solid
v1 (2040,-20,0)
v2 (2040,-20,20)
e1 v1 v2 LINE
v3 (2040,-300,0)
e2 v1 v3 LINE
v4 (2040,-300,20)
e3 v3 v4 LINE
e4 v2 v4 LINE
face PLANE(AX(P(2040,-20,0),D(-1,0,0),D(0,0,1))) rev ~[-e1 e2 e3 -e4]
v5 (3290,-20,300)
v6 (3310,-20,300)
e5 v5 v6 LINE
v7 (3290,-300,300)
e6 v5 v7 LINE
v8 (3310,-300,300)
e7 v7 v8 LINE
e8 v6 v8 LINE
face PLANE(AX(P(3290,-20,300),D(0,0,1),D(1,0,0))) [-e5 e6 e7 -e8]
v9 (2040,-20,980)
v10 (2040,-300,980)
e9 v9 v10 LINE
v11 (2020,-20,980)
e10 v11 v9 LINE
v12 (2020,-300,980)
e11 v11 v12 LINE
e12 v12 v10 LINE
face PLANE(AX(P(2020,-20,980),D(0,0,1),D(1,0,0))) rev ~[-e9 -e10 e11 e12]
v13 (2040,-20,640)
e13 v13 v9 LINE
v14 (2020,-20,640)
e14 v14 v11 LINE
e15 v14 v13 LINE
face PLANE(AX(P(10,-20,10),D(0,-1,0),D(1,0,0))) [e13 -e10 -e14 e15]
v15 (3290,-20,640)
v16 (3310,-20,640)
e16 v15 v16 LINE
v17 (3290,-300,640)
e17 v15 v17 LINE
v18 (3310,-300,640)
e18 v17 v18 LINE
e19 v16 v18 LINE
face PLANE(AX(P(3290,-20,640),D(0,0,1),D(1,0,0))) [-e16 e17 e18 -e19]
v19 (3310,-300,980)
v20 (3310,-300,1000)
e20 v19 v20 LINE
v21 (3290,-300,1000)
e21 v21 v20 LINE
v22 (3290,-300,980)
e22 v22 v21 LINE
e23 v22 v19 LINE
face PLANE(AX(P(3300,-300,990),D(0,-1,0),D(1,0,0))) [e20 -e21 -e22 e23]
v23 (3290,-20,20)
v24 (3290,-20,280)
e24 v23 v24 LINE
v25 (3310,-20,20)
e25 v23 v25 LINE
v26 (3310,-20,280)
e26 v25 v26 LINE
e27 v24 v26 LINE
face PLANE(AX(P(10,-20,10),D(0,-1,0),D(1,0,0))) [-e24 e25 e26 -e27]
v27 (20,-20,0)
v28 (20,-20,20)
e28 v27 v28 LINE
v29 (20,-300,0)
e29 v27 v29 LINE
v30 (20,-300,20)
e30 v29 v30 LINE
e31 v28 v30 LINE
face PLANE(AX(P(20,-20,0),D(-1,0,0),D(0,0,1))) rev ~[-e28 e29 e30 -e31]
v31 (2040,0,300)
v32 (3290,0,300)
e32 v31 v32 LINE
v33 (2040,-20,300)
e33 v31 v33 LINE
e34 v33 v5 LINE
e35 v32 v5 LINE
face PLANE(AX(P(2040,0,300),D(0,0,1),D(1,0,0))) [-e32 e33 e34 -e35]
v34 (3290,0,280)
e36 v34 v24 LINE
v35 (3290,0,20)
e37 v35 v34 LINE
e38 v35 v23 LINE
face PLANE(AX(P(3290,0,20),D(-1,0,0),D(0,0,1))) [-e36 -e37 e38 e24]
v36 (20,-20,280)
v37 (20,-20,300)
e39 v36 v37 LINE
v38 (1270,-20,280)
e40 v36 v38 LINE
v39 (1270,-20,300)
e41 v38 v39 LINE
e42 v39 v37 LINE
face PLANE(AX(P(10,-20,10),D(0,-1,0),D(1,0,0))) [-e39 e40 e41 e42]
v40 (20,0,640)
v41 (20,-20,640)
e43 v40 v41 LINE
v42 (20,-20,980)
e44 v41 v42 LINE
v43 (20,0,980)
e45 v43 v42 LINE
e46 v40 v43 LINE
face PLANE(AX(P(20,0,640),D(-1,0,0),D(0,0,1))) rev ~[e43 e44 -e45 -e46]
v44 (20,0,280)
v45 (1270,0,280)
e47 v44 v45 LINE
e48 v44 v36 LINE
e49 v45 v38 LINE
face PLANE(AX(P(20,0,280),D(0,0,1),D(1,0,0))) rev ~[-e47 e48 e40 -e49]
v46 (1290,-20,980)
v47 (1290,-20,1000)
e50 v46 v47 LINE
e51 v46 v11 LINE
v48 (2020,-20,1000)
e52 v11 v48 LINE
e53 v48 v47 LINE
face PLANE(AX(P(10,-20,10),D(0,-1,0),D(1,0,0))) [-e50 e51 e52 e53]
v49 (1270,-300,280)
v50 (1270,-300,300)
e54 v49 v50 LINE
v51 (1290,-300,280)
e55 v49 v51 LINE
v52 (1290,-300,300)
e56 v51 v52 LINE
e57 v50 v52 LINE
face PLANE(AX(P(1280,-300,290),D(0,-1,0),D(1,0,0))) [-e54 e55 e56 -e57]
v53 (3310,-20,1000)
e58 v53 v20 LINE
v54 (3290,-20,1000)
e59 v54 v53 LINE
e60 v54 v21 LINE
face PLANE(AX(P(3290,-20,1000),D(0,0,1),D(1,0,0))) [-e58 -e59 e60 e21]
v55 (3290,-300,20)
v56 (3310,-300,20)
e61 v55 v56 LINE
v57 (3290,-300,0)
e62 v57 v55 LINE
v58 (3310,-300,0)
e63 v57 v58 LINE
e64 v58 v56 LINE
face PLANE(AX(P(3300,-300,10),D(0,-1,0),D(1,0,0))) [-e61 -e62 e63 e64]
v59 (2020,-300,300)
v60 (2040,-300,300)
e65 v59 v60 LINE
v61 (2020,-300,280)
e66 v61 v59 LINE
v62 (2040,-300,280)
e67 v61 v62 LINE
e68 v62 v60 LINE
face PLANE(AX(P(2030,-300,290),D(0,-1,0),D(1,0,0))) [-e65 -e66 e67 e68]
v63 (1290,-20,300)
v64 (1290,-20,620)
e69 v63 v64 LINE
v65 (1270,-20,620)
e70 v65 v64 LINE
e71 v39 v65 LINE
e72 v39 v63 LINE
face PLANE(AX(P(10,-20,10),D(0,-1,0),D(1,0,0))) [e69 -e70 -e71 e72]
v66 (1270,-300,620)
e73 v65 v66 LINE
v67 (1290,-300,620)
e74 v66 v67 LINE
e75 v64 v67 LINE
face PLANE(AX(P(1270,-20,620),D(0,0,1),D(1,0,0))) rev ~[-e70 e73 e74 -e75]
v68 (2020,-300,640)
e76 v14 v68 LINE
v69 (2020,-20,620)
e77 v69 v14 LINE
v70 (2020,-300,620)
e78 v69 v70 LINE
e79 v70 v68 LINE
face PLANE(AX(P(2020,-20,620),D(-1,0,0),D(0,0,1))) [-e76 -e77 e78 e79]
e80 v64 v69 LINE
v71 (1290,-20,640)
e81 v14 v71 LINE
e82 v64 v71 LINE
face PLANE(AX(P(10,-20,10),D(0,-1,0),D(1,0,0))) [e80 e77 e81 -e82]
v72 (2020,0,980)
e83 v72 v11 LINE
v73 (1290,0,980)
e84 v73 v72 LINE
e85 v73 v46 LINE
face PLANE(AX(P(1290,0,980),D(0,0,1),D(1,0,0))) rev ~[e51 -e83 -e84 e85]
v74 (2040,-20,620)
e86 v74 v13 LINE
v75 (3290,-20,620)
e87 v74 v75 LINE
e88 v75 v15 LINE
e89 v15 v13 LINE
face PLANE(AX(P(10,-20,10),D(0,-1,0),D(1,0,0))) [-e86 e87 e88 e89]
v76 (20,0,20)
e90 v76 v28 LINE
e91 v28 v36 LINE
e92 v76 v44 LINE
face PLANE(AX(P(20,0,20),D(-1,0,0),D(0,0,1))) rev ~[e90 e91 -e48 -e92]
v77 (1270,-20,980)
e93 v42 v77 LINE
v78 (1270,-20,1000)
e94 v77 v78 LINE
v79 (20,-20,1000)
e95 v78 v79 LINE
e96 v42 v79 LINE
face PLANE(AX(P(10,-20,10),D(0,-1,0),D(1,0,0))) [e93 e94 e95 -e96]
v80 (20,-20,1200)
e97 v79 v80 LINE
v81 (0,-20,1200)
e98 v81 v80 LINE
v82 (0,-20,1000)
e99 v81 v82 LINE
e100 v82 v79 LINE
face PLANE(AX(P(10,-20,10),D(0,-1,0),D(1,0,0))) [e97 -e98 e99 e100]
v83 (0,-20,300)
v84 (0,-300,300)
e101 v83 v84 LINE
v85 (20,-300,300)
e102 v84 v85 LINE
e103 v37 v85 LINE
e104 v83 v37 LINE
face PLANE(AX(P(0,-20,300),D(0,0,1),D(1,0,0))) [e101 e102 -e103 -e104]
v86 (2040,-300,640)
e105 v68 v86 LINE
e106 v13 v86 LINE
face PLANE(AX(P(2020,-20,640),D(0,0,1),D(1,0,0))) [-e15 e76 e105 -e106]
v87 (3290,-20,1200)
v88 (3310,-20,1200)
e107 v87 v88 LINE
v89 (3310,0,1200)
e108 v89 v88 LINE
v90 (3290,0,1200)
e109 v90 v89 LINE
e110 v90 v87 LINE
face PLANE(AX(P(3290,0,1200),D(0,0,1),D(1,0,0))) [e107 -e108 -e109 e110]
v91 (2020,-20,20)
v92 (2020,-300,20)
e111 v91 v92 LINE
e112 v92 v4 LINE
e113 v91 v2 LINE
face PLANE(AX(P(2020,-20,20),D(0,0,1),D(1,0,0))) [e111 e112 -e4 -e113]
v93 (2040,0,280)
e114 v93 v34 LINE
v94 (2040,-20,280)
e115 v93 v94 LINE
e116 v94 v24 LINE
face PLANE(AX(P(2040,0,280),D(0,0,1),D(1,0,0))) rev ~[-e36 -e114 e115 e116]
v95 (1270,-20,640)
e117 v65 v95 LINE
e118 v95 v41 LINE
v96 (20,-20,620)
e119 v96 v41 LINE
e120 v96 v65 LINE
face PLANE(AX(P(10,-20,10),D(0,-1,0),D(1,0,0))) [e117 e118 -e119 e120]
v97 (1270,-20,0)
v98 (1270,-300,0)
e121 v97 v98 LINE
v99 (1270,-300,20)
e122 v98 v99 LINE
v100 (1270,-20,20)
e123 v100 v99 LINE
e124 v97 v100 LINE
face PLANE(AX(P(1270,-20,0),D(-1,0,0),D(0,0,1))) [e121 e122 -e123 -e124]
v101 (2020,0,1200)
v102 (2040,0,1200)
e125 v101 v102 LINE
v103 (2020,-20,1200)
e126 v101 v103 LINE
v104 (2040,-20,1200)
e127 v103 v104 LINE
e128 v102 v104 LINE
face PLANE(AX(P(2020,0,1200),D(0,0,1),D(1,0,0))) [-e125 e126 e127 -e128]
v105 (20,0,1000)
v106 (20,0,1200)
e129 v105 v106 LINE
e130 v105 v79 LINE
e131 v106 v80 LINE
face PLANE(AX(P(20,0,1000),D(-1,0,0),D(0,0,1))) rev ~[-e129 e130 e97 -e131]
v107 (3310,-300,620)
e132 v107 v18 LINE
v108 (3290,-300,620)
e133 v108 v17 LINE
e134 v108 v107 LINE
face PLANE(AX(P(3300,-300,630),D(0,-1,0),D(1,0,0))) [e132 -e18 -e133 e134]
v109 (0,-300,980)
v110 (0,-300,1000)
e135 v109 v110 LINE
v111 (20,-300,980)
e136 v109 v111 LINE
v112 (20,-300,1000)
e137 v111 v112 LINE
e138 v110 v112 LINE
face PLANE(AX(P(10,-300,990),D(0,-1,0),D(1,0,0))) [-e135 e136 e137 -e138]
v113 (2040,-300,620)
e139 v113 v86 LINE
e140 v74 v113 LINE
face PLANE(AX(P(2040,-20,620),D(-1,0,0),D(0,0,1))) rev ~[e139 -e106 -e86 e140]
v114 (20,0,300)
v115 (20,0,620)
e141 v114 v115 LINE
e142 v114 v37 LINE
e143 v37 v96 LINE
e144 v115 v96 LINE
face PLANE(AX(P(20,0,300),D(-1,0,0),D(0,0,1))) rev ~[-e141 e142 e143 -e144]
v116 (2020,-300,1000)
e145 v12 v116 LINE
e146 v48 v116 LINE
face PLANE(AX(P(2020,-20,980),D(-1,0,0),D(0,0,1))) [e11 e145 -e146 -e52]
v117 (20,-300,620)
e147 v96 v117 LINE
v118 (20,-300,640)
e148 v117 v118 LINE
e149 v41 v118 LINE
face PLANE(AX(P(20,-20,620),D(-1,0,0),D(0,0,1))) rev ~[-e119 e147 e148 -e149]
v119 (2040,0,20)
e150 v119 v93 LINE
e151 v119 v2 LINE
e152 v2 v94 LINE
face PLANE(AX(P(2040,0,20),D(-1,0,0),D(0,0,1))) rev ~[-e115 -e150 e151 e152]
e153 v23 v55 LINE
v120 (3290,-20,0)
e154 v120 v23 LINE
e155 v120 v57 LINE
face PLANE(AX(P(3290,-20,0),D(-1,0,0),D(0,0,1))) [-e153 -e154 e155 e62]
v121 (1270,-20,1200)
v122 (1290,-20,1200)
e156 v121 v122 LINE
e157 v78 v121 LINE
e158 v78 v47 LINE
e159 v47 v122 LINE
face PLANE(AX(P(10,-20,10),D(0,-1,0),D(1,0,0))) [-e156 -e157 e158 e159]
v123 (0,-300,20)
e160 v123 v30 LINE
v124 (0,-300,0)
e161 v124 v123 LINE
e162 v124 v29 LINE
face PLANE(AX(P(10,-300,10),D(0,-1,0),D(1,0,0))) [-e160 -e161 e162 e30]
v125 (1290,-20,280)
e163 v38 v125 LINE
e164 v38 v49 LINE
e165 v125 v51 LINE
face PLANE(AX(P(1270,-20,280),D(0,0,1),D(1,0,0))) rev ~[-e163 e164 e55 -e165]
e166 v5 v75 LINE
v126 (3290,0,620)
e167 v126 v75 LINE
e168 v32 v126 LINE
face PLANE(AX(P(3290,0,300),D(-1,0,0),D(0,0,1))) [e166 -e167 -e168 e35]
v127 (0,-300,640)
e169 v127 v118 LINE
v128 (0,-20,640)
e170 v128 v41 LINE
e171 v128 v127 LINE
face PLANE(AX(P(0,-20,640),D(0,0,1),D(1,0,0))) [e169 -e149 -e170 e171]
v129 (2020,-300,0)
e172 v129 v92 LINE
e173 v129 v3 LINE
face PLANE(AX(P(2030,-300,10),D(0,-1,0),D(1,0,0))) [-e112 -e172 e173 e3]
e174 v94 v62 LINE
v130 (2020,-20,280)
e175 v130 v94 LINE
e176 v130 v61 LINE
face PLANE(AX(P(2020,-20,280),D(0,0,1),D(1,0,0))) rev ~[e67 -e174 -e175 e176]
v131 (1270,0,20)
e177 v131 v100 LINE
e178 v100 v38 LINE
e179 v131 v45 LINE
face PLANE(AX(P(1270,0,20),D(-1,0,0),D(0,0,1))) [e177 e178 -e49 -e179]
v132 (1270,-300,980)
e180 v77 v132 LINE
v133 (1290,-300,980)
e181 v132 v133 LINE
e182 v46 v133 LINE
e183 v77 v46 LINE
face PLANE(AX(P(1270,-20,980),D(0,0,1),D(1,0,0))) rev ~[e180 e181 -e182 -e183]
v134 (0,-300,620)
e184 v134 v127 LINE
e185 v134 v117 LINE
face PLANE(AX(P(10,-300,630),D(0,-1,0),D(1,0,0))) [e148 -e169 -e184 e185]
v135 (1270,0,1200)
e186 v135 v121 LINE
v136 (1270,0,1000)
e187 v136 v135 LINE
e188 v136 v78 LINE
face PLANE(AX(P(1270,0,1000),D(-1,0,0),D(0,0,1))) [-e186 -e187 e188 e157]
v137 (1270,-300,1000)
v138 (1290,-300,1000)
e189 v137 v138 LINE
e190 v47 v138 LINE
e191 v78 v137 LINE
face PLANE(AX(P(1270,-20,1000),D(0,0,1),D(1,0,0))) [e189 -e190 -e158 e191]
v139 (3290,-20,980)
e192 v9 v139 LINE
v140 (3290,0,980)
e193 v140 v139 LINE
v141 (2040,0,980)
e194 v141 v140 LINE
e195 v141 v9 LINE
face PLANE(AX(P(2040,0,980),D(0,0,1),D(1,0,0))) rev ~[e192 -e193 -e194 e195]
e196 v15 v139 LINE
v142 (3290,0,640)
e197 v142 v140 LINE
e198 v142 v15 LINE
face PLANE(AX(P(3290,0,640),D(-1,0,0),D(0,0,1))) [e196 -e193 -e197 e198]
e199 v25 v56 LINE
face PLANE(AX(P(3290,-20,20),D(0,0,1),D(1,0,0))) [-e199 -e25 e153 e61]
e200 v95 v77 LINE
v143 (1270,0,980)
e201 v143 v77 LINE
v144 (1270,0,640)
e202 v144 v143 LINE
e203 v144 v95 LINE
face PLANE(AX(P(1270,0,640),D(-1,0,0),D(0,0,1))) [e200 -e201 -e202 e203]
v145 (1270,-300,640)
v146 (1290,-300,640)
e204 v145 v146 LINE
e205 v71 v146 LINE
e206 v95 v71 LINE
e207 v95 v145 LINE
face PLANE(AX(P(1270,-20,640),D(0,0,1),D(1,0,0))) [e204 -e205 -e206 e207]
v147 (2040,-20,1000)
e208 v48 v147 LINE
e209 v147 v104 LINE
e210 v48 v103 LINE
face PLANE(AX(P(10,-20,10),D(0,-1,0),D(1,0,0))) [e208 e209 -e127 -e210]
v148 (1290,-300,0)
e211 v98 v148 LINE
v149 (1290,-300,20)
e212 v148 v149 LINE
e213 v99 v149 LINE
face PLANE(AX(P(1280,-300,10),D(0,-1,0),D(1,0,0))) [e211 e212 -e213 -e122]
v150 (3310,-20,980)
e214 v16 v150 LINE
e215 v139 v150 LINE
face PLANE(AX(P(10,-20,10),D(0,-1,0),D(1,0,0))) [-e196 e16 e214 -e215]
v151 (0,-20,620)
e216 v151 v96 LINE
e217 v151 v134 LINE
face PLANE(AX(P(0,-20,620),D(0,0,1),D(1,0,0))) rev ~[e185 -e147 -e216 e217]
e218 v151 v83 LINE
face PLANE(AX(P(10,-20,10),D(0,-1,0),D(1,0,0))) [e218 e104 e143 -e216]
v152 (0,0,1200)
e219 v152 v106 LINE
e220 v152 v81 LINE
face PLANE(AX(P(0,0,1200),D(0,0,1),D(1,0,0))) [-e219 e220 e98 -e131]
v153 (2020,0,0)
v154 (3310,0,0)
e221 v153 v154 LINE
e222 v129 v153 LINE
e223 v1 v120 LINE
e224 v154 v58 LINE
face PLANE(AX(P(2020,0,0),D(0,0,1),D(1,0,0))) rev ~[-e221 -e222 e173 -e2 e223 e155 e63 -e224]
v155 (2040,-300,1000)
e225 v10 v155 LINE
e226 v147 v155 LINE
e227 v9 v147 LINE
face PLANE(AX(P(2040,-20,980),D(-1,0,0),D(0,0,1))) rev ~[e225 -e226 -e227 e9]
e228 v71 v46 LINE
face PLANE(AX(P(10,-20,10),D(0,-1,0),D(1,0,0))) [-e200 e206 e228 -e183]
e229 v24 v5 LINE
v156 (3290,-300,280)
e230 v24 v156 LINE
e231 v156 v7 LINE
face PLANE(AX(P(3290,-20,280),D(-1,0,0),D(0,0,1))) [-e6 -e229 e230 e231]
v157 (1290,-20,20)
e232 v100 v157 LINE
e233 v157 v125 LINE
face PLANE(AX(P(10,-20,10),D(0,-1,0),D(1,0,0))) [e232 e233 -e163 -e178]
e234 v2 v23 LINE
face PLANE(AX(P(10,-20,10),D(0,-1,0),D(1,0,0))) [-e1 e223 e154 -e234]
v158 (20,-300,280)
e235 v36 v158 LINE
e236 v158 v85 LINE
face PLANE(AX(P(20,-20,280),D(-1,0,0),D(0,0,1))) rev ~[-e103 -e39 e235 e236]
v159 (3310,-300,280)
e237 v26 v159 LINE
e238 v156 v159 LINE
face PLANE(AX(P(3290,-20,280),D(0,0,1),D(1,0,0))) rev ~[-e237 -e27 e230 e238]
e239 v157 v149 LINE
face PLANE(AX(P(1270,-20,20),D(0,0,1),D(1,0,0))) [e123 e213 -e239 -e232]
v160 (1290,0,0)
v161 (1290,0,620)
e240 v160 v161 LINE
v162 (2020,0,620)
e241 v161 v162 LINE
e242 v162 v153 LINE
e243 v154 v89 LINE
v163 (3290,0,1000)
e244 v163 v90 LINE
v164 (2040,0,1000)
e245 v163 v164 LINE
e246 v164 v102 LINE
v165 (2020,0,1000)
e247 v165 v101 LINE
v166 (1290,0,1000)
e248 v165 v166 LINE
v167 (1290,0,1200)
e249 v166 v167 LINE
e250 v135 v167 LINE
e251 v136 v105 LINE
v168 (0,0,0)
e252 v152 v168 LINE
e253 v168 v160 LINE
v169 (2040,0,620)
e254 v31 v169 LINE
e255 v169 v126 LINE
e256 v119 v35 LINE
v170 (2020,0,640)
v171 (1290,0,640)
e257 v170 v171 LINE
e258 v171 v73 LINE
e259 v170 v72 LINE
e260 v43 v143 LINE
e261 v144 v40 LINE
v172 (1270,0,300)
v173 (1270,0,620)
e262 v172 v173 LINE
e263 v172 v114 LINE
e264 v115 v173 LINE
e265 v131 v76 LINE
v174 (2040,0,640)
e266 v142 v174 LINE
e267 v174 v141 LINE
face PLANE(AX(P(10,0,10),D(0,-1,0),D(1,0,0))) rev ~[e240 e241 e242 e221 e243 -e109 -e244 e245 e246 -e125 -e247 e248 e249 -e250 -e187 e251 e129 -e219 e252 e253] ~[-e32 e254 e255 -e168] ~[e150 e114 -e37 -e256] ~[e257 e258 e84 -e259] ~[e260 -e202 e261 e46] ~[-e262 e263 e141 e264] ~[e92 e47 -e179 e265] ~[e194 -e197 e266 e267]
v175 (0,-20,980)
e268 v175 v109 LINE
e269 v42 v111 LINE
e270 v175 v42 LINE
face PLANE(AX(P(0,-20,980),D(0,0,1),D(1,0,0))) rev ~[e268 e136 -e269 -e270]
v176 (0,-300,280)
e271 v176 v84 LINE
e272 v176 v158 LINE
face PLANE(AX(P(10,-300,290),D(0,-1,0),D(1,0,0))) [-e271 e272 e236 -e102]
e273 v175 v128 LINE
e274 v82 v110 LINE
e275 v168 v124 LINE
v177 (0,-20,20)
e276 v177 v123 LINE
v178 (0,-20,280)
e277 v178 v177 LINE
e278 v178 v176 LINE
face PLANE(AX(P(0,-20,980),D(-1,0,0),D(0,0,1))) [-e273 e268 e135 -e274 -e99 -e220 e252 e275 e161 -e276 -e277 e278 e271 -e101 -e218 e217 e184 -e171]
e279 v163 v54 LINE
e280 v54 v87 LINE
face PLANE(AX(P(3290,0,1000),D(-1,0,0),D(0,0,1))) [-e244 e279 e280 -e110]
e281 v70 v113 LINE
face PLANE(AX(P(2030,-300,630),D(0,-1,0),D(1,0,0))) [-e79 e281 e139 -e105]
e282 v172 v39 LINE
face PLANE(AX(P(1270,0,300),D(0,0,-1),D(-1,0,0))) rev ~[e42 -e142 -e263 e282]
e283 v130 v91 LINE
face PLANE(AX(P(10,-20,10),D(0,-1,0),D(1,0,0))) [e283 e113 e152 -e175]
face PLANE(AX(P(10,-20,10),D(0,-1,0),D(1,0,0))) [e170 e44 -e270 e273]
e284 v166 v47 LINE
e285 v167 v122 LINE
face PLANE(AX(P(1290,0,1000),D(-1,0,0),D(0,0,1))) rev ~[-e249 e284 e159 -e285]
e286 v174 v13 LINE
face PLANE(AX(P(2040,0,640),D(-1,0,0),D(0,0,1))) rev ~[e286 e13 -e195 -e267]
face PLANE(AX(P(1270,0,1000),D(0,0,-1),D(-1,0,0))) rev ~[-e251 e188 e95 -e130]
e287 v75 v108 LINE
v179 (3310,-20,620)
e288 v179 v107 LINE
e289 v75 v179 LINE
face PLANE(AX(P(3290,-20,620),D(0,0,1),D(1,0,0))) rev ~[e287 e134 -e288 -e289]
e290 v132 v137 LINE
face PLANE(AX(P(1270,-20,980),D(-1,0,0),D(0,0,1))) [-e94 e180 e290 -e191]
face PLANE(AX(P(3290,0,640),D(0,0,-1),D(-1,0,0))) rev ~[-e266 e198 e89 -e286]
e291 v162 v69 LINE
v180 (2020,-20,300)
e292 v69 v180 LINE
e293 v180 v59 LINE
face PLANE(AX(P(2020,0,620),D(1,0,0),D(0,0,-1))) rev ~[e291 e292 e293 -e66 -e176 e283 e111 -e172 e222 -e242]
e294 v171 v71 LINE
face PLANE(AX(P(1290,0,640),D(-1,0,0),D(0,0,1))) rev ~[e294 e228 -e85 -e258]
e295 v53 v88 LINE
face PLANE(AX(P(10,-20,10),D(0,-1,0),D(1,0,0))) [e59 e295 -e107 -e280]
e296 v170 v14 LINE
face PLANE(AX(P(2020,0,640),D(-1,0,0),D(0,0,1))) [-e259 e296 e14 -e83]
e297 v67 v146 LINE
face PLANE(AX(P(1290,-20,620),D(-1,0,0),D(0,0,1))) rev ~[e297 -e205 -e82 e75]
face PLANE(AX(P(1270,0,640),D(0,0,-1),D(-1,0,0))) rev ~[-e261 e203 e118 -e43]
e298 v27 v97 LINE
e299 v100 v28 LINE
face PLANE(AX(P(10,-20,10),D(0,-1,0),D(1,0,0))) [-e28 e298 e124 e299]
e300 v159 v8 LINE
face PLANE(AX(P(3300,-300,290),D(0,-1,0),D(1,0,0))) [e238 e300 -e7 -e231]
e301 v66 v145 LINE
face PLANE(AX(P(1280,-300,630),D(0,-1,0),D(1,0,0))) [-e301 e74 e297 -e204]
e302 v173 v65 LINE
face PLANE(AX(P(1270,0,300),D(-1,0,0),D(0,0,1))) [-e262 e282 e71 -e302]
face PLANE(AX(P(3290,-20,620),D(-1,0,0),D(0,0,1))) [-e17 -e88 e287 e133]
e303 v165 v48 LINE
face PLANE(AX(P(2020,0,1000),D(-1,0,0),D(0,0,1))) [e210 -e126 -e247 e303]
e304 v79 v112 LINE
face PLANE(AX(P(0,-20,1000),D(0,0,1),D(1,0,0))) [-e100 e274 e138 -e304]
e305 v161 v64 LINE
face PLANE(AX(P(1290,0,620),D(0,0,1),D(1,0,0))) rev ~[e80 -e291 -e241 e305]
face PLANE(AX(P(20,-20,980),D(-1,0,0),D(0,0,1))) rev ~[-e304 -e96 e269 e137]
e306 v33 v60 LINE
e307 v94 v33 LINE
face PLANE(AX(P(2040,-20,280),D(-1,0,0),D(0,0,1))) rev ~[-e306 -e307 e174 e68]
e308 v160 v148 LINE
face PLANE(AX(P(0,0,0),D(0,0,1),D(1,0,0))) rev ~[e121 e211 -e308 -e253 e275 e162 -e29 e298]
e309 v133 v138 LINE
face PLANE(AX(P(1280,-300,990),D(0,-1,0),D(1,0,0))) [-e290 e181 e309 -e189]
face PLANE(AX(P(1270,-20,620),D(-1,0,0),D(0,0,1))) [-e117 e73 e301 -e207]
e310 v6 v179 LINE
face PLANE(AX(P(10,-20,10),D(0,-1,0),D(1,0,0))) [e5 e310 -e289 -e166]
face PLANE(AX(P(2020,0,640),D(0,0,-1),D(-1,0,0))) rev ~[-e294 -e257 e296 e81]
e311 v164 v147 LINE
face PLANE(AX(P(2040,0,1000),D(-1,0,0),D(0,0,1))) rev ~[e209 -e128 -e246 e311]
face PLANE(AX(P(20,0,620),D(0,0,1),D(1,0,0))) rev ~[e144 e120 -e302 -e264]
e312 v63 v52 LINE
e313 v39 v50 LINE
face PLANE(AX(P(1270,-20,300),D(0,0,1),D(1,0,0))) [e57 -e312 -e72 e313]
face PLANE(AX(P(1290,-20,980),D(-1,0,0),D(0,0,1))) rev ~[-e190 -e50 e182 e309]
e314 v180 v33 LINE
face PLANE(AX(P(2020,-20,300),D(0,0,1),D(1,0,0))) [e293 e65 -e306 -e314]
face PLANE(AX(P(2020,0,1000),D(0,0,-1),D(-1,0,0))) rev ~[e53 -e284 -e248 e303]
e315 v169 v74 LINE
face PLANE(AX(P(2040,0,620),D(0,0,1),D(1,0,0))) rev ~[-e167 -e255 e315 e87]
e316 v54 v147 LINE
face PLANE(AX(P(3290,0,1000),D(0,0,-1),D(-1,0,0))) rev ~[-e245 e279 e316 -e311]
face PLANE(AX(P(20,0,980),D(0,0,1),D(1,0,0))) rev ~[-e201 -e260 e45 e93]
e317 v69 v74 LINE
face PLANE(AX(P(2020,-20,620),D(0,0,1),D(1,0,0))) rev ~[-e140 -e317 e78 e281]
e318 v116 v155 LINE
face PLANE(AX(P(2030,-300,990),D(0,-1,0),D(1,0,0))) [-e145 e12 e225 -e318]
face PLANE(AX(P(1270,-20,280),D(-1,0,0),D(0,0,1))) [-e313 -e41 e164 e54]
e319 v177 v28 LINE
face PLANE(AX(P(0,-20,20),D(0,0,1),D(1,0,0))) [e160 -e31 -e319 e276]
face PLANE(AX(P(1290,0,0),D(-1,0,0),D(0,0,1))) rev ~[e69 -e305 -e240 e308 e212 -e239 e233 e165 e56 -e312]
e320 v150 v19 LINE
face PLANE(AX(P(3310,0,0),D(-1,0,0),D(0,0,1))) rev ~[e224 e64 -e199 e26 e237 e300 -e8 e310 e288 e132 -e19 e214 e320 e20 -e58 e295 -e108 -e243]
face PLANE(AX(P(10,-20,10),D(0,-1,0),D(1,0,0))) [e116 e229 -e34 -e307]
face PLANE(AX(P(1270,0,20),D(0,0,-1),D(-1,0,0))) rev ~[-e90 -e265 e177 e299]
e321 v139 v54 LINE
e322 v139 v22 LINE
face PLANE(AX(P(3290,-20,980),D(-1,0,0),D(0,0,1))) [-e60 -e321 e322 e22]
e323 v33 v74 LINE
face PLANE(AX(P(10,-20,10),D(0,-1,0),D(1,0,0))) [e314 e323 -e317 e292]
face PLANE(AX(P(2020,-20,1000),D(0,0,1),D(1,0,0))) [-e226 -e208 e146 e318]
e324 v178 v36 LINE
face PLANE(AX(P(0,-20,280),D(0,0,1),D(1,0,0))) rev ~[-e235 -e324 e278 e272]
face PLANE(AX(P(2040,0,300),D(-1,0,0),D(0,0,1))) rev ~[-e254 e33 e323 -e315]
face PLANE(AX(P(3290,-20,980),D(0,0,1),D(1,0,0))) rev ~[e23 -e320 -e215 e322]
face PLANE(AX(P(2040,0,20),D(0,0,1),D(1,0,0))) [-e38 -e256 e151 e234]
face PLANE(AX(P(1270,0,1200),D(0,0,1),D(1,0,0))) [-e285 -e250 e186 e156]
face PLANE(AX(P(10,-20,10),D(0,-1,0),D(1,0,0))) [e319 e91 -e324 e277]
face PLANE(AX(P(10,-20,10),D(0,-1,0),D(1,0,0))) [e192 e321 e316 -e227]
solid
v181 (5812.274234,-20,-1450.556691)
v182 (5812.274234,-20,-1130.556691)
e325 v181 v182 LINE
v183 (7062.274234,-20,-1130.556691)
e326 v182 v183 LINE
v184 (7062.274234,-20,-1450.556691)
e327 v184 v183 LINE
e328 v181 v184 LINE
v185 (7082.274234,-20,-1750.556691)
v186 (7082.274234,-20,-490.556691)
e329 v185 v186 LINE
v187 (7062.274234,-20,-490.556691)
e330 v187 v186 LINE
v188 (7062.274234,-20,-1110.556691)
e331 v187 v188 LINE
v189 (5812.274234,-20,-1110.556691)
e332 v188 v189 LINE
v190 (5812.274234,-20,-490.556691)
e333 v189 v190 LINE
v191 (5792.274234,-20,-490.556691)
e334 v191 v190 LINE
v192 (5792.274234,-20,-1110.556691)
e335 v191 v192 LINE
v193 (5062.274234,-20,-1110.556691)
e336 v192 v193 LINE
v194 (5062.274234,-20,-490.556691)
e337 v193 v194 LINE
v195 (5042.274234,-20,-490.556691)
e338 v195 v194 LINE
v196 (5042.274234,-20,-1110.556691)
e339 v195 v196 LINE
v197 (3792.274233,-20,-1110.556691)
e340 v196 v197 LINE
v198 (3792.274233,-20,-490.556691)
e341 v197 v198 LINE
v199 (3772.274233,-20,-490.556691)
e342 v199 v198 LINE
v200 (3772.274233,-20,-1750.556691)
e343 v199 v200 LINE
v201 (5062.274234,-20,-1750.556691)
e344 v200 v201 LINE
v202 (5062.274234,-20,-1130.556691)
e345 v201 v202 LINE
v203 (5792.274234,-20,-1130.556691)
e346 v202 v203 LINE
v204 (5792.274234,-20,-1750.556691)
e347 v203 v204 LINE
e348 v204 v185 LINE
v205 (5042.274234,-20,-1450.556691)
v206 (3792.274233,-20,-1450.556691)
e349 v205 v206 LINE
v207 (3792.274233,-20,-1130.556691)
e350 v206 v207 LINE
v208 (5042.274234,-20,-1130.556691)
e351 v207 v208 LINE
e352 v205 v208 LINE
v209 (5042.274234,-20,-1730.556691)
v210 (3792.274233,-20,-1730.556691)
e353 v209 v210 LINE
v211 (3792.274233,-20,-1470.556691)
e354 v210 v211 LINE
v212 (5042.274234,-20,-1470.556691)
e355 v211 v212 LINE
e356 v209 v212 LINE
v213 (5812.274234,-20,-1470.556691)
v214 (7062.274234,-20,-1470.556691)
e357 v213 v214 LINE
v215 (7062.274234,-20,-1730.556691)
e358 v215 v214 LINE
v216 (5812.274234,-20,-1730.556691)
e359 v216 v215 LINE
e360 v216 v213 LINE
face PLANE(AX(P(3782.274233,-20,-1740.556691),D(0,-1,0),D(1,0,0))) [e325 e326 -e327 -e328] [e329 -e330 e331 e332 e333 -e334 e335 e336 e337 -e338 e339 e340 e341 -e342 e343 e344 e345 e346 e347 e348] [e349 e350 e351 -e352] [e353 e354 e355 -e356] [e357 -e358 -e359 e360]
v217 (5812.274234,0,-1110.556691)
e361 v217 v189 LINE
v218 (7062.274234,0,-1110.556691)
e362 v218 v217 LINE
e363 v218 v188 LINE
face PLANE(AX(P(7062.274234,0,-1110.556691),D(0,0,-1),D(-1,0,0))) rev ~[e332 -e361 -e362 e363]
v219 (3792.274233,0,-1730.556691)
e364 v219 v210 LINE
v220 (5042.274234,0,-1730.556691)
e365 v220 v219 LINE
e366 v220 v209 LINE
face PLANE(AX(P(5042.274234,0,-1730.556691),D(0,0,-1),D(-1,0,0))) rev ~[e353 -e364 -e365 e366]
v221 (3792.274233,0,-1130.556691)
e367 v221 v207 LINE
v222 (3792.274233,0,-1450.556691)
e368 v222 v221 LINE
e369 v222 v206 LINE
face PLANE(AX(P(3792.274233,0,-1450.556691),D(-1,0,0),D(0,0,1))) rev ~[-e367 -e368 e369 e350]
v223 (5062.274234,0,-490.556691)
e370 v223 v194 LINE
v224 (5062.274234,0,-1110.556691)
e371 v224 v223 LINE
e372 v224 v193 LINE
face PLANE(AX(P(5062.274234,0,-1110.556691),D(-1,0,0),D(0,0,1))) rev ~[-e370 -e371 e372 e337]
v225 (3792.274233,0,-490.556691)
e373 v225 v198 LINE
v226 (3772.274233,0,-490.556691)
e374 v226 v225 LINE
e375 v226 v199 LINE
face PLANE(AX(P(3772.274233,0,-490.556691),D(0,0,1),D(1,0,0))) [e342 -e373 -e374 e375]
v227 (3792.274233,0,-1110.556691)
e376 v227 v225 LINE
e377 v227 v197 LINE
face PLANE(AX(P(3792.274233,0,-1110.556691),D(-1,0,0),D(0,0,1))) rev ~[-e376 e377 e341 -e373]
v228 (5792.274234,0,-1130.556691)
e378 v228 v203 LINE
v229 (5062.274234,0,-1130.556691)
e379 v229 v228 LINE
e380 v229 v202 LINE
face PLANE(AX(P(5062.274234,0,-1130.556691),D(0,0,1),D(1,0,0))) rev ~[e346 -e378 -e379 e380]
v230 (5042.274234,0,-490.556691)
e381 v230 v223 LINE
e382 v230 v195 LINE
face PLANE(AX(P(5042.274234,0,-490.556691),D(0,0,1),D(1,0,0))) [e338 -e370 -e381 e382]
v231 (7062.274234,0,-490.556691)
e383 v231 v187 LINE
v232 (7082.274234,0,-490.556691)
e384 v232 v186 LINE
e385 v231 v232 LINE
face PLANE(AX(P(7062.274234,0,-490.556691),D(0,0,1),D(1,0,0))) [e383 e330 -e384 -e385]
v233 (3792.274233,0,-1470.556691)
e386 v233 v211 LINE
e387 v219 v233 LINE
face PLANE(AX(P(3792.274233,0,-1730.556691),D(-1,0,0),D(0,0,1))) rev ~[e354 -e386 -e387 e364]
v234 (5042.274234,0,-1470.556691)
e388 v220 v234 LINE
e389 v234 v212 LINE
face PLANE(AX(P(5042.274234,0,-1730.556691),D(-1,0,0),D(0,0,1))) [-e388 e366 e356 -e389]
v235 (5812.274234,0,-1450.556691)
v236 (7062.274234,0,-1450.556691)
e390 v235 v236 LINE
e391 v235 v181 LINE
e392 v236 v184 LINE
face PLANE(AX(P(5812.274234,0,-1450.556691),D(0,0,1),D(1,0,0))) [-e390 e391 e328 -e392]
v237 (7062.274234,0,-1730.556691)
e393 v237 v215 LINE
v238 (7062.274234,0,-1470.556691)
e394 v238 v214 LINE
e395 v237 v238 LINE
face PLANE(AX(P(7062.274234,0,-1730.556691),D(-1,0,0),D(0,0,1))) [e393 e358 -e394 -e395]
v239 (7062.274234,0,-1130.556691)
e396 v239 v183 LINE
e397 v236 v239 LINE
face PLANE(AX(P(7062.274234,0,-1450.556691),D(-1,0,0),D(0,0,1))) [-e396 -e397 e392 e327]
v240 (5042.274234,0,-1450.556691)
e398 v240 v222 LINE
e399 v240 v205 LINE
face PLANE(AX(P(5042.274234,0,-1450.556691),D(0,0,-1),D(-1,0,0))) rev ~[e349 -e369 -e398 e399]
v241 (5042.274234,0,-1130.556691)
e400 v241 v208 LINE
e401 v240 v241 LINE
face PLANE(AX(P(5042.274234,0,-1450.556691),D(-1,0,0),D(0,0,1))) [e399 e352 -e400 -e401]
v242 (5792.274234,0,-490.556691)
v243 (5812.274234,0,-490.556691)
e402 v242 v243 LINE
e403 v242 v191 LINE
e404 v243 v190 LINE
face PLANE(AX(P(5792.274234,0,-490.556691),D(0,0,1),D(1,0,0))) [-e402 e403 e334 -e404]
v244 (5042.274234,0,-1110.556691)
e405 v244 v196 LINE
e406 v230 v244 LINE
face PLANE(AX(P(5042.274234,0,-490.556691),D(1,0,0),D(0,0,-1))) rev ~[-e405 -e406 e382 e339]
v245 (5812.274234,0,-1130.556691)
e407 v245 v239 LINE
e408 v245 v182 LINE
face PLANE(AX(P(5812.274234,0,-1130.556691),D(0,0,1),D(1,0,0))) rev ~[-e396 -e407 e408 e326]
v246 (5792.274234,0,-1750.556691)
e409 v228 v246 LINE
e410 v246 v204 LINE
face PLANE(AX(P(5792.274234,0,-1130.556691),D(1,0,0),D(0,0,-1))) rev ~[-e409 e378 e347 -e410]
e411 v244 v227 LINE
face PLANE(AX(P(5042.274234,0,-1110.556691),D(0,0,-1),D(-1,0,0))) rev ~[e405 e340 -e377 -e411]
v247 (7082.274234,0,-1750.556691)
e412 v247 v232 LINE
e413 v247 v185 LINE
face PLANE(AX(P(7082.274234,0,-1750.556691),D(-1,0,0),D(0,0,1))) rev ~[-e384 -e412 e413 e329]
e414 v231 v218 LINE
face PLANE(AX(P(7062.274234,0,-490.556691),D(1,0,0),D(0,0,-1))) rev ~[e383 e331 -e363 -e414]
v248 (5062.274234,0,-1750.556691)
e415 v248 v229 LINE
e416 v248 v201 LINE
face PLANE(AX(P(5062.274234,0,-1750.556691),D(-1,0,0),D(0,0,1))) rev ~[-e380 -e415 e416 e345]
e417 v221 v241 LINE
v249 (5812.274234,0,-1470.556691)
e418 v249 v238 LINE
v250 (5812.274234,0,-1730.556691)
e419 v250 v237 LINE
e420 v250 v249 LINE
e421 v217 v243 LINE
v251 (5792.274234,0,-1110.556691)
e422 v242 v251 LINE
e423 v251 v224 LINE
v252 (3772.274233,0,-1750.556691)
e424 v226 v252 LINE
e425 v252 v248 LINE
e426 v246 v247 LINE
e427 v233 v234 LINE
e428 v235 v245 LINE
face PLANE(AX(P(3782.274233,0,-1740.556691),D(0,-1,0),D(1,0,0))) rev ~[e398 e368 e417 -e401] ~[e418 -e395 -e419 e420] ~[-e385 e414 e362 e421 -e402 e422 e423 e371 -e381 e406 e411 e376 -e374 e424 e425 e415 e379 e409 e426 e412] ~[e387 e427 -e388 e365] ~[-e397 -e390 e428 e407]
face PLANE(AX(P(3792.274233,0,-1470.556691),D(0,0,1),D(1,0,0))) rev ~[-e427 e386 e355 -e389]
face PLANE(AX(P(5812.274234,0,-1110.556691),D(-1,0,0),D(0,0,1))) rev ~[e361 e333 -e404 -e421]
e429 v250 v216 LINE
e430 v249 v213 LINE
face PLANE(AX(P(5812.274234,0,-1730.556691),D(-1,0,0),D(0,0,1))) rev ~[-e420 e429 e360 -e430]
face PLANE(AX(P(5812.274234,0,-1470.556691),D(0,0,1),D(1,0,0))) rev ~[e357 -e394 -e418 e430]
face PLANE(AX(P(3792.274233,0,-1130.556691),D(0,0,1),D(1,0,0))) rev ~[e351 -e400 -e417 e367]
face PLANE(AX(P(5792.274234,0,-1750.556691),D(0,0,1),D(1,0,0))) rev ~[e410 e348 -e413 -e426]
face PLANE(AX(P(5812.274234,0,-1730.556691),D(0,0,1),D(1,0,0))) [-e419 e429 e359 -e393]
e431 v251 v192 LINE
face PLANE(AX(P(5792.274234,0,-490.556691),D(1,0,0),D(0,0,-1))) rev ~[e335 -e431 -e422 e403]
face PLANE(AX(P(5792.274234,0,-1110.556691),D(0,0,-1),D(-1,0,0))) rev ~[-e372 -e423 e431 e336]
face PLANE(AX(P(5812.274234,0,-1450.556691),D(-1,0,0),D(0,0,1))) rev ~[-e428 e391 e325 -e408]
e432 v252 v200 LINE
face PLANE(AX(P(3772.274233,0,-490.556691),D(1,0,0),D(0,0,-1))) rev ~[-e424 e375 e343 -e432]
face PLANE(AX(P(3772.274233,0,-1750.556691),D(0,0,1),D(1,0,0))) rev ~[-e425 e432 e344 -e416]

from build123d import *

# Parameters (mm, degrees)
F0_W     = 20
F0_H     = 20
F0_W_2   = 1250
F0_H_2   = 260
F0_H_3   = 320
F0_H_4   = 340
F0_W_3   = 730
F0_H_5   = 200
F1_DEPTH = 20
F0_H_6   = 620
F0_H_7   = 280
F2_W     = 20
F2_H     = 20
F3_DEPTH = 280


with BuildPart() as f1:
    # F0 (on Front) → F1 (new body)
    with BuildSketch(Plane.XZ):
        with Locations((10, 10)):
            Rectangle(F0_W, F0_H)
        with Locations((645, 10)):
            Rectangle(F0_W_2, F0_H)
        with Locations((10, 150)):
            Rectangle(F0_W, F0_H_2)
        with Locations((1280, 10)):
            Rectangle(F0_W, F0_H)
        with Locations((10, 290)):
            Rectangle(F0_W, F0_H)
        with Locations((1280, 150)):
            Rectangle(F0_W, F0_H_2)
        with Locations((645, 290)):
            Rectangle(F0_W_2, F0_H)
        with Locations((10, 460)):
            Rectangle(F0_W, F0_H_3)
        with Locations((1280, 290)):
            Rectangle(F0_W, F0_H)
        with Locations((10, 630)):
            Rectangle(F0_W, F0_H)
        with Locations((1280, 460)):
            Rectangle(F0_W, F0_H_3)
        with Locations((645, 630)):
            Rectangle(F0_W_2, F0_H)
        with Locations((10, 810)):
            Rectangle(F0_W, F0_H_4)
        with Locations((1280, 630)):
            Rectangle(F0_W, F0_H)
        with Locations((10, 990)):
            Rectangle(F0_W, F0_H)
        with Locations((1655, 630)):
            Rectangle(F0_W_3, F0_H)
        with Locations((1280, 810)):
            Rectangle(F0_W, F0_H_4)
        with Locations((645, 990)):
            Rectangle(F0_W_2, F0_H)
        with Locations((10, 1100)):
            Rectangle(F0_W, F0_H_5)
        with Locations((2030, 460)):
            Rectangle(F0_W, F0_H_3)
        with Locations((2030, 630)):
            Rectangle(F0_W, F0_H)
        with Locations((1280, 990)):
            Rectangle(F0_W, F0_H)
        with Locations((1655, 990)):
            Rectangle(F0_W_3, F0_H)
        with Locations((2030, 810)):
            Rectangle(F0_W, F0_H_4)
        with Locations((2030, 290)):
            Rectangle(F0_W, F0_H)
        with Locations((2665, 630)):
            Rectangle(F0_W_2, F0_H)
        with Locations((1280, 1100)):
            Rectangle(F0_W, F0_H_5)
        Polygon((2020, 1000), (2020, 980), (2040, 980), (3290, 980), (3290, 1000), (2040, 1000), align=None)
        with Locations((2030, 150)):
            Rectangle(F0_W, F0_H_2)
        with Locations((2665, 290)):
            Rectangle(F0_W_2, F0_H)
        with Locations((3300, 630)):
            Rectangle(F0_W, F0_H)
        with Locations((3300, 460)):
            Rectangle(F0_W, F0_H_3)
        with Locations((2030, 1100)):
            Rectangle(F0_W, F0_H_5)
        with Locations((3300, 810)):
            Rectangle(F0_W, F0_H_4)
        with Locations((2030, 10)):
            Rectangle(F0_W, F0_H)
        with Locations((3300, 290)):
            Rectangle(F0_W, F0_H)
        with Locations((3300, 990)):
            Rectangle(F0_W, F0_H)
        with Locations((2665, 10)):
            Rectangle(F0_W_2, F0_H)
        with Locations((3300, 150)):
            Rectangle(F0_W, F0_H_2)
        with Locations((3300, 1100)):
            Rectangle(F0_W, F0_H_5)
        with Locations((3300, 10)):
            Rectangle(F0_W, F0_H)
    extrude(amount=F1_DEPTH)

    # F2 (on face) → F3 (join)
    with BuildSketch(Plane.XZ.offset(20)):
        with Locations((10, 990)):
            Rectangle(F2_W, F2_H)
        with Locations((10, 630)):
            Rectangle(F2_W, F2_H)
        with Locations((10, 290)):
            Rectangle(F2_W, F2_H)
        with Locations((10, 10)):
            Rectangle(F2_W, F2_H)
        with Locations((1280, 290)):
            Rectangle(F2_W, F2_H)
        with Locations((1280, 990)):
            Rectangle(F2_W, F2_H)
        with Locations((1280, 630)):
            Rectangle(F2_W, F2_H)
        with Locations((1280, 10)):
            Rectangle(F2_W, F2_H)
        with Locations((2030, 630)):
            Rectangle(F2_W, F2_H)
        with Locations((2030, 290)):
            Rectangle(F2_W, F2_H)
        with Locations((2030, 10)):
            Rectangle(F2_W, F2_H)
        with Locations((3300, 10)):
            Rectangle(F2_W, F2_H)
        with Locations((3300, 630)):
            Rectangle(F2_W, F2_H)
        with Locations((3300, 290)):
            Rectangle(F2_W, F2_H)
        with Locations((2030, 990)):
            Rectangle(F2_W, F2_H)
        with Locations((3300, 990)):
            Rectangle(F2_W, F2_H)
    extrude(amount=F3_DEPTH)


with BuildPart() as f1b:
    # F0 (on Front) → F1, piece 2 (new body)
    with BuildSketch(Plane.XZ):
        with Locations((3782.2742335002, -1740.5566911344)):
            Rectangle(F0_W, F0_H)
        with Locations((4417.2742335002, -1740.5566911344)):
            Rectangle(F0_W_2, F0_H)
        with Locations((3782.2742335002, -1600.5566911344)):
            Rectangle(F0_W, F0_H_2)
        with Locations((5052.2742335002, -1740.5566911344)):
            Rectangle(F0_W, F0_H)
        with Locations((3782.2742335002, -1460.5566911344)):
            Rectangle(F0_W, F0_H)
        with Locations((5052.2742335002, -1600.5566911344)):
            Rectangle(F0_W, F0_H_2)
        with Locations((4417.2742335002, -1460.5566911344)):
            Rectangle(F0_W_2, F0_H)
        with Locations((3782.2742335002, -1290.5566911344)):
            Rectangle(F0_W, F0_H_3)
        with Locations((5052.2742335002, -1460.5566911344)):
            Rectangle(F0_W, F0_H)
        with Locations((3782.2742335002, -1120.5566911344)):
            Rectangle(F0_W, F0_H)
        with Locations((5052.2742335002, -1290.5566911344)):
            Rectangle(F0_W, F0_H_3)
        with Locations((4417.2742335002, -1120.5566911344)):
            Rectangle(F0_W_2, F0_H)
        with Locations((3782.2742335002, -800.5566911344)):
            Rectangle(F0_W, F0_H_6)
        with Locations((5052.2742335002, -1120.5566911344)):
            Rectangle(F0_W, F0_H)
        with Locations((5427.2742335002, -1120.5566911344)):
            Rectangle(F0_W_3, F0_H)
        with Locations((5052.2742335002, -940.5566911344)):
            Rectangle(F0_W, F0_H_4)
        with Locations((5802.2742335002, -1290.5566911344)):
            Rectangle(F0_W, F0_H_3)
        with Locations((5802.2742335002, -1120.5566911344)):
            Rectangle(F0_W, F0_H)
        with Locations((5052.2742335002, -630.5566911344)):
            Rectangle(F0_W, F0_H_7)
        with Locations((5802.2742335002, -940.5566911344)):
            Rectangle(F0_W, F0_H_4)
        with Locations((5802.2742335002, -1460.5566911344)):
            Rectangle(F0_W, F0_H)
        with Locations((6437.2742335002, -1120.5566911344)):
            Rectangle(F0_W_2, F0_H)
        with Locations((5802.2742335002, -630.5566911344)):
            Rectangle(F0_W, F0_H_7)
        with Locations((5802.2742335002, -1600.5566911344)):
            Rectangle(F0_W, F0_H_2)
        with Locations((6437.2742335002, -1460.5566911344)):
            Rectangle(F0_W_2, F0_H)
        with Locations((7072.2742335002, -1120.5566911344)):
            Rectangle(F0_W, F0_H)
        with Locations((7072.2742335002, -1290.5566911344)):
            Rectangle(F0_W, F0_H_3)
        with Locations((7072.2742335002, -940.5566911344)):
            Rectangle(F0_W, F0_H_4)
        with Locations((5802.2742335002, -1740.5566911344)):
            Rectangle(F0_W, F0_H)
        with Locations((7072.2742335002, -1460.5566911344)):
            Rectangle(F0_W, F0_H)
        with Locations((7072.2742335002, -630.5566911344)):
            Rectangle(F0_W, F0_H_7)
        with Locations((6437.2742335002, -1740.5566911344)):
            Rectangle(F0_W_2, F0_H)
        with Locations((7072.2742335002, -1600.5566911344)):
            Rectangle(F0_W, F0_H_2)
        with Locations((7072.2742335002, -1740.5566911344)):
            Rectangle(F0_W, F0_H)
    extrude(amount=F1_DEPTH)


solid = Compound([f1.part, f1b.part])
